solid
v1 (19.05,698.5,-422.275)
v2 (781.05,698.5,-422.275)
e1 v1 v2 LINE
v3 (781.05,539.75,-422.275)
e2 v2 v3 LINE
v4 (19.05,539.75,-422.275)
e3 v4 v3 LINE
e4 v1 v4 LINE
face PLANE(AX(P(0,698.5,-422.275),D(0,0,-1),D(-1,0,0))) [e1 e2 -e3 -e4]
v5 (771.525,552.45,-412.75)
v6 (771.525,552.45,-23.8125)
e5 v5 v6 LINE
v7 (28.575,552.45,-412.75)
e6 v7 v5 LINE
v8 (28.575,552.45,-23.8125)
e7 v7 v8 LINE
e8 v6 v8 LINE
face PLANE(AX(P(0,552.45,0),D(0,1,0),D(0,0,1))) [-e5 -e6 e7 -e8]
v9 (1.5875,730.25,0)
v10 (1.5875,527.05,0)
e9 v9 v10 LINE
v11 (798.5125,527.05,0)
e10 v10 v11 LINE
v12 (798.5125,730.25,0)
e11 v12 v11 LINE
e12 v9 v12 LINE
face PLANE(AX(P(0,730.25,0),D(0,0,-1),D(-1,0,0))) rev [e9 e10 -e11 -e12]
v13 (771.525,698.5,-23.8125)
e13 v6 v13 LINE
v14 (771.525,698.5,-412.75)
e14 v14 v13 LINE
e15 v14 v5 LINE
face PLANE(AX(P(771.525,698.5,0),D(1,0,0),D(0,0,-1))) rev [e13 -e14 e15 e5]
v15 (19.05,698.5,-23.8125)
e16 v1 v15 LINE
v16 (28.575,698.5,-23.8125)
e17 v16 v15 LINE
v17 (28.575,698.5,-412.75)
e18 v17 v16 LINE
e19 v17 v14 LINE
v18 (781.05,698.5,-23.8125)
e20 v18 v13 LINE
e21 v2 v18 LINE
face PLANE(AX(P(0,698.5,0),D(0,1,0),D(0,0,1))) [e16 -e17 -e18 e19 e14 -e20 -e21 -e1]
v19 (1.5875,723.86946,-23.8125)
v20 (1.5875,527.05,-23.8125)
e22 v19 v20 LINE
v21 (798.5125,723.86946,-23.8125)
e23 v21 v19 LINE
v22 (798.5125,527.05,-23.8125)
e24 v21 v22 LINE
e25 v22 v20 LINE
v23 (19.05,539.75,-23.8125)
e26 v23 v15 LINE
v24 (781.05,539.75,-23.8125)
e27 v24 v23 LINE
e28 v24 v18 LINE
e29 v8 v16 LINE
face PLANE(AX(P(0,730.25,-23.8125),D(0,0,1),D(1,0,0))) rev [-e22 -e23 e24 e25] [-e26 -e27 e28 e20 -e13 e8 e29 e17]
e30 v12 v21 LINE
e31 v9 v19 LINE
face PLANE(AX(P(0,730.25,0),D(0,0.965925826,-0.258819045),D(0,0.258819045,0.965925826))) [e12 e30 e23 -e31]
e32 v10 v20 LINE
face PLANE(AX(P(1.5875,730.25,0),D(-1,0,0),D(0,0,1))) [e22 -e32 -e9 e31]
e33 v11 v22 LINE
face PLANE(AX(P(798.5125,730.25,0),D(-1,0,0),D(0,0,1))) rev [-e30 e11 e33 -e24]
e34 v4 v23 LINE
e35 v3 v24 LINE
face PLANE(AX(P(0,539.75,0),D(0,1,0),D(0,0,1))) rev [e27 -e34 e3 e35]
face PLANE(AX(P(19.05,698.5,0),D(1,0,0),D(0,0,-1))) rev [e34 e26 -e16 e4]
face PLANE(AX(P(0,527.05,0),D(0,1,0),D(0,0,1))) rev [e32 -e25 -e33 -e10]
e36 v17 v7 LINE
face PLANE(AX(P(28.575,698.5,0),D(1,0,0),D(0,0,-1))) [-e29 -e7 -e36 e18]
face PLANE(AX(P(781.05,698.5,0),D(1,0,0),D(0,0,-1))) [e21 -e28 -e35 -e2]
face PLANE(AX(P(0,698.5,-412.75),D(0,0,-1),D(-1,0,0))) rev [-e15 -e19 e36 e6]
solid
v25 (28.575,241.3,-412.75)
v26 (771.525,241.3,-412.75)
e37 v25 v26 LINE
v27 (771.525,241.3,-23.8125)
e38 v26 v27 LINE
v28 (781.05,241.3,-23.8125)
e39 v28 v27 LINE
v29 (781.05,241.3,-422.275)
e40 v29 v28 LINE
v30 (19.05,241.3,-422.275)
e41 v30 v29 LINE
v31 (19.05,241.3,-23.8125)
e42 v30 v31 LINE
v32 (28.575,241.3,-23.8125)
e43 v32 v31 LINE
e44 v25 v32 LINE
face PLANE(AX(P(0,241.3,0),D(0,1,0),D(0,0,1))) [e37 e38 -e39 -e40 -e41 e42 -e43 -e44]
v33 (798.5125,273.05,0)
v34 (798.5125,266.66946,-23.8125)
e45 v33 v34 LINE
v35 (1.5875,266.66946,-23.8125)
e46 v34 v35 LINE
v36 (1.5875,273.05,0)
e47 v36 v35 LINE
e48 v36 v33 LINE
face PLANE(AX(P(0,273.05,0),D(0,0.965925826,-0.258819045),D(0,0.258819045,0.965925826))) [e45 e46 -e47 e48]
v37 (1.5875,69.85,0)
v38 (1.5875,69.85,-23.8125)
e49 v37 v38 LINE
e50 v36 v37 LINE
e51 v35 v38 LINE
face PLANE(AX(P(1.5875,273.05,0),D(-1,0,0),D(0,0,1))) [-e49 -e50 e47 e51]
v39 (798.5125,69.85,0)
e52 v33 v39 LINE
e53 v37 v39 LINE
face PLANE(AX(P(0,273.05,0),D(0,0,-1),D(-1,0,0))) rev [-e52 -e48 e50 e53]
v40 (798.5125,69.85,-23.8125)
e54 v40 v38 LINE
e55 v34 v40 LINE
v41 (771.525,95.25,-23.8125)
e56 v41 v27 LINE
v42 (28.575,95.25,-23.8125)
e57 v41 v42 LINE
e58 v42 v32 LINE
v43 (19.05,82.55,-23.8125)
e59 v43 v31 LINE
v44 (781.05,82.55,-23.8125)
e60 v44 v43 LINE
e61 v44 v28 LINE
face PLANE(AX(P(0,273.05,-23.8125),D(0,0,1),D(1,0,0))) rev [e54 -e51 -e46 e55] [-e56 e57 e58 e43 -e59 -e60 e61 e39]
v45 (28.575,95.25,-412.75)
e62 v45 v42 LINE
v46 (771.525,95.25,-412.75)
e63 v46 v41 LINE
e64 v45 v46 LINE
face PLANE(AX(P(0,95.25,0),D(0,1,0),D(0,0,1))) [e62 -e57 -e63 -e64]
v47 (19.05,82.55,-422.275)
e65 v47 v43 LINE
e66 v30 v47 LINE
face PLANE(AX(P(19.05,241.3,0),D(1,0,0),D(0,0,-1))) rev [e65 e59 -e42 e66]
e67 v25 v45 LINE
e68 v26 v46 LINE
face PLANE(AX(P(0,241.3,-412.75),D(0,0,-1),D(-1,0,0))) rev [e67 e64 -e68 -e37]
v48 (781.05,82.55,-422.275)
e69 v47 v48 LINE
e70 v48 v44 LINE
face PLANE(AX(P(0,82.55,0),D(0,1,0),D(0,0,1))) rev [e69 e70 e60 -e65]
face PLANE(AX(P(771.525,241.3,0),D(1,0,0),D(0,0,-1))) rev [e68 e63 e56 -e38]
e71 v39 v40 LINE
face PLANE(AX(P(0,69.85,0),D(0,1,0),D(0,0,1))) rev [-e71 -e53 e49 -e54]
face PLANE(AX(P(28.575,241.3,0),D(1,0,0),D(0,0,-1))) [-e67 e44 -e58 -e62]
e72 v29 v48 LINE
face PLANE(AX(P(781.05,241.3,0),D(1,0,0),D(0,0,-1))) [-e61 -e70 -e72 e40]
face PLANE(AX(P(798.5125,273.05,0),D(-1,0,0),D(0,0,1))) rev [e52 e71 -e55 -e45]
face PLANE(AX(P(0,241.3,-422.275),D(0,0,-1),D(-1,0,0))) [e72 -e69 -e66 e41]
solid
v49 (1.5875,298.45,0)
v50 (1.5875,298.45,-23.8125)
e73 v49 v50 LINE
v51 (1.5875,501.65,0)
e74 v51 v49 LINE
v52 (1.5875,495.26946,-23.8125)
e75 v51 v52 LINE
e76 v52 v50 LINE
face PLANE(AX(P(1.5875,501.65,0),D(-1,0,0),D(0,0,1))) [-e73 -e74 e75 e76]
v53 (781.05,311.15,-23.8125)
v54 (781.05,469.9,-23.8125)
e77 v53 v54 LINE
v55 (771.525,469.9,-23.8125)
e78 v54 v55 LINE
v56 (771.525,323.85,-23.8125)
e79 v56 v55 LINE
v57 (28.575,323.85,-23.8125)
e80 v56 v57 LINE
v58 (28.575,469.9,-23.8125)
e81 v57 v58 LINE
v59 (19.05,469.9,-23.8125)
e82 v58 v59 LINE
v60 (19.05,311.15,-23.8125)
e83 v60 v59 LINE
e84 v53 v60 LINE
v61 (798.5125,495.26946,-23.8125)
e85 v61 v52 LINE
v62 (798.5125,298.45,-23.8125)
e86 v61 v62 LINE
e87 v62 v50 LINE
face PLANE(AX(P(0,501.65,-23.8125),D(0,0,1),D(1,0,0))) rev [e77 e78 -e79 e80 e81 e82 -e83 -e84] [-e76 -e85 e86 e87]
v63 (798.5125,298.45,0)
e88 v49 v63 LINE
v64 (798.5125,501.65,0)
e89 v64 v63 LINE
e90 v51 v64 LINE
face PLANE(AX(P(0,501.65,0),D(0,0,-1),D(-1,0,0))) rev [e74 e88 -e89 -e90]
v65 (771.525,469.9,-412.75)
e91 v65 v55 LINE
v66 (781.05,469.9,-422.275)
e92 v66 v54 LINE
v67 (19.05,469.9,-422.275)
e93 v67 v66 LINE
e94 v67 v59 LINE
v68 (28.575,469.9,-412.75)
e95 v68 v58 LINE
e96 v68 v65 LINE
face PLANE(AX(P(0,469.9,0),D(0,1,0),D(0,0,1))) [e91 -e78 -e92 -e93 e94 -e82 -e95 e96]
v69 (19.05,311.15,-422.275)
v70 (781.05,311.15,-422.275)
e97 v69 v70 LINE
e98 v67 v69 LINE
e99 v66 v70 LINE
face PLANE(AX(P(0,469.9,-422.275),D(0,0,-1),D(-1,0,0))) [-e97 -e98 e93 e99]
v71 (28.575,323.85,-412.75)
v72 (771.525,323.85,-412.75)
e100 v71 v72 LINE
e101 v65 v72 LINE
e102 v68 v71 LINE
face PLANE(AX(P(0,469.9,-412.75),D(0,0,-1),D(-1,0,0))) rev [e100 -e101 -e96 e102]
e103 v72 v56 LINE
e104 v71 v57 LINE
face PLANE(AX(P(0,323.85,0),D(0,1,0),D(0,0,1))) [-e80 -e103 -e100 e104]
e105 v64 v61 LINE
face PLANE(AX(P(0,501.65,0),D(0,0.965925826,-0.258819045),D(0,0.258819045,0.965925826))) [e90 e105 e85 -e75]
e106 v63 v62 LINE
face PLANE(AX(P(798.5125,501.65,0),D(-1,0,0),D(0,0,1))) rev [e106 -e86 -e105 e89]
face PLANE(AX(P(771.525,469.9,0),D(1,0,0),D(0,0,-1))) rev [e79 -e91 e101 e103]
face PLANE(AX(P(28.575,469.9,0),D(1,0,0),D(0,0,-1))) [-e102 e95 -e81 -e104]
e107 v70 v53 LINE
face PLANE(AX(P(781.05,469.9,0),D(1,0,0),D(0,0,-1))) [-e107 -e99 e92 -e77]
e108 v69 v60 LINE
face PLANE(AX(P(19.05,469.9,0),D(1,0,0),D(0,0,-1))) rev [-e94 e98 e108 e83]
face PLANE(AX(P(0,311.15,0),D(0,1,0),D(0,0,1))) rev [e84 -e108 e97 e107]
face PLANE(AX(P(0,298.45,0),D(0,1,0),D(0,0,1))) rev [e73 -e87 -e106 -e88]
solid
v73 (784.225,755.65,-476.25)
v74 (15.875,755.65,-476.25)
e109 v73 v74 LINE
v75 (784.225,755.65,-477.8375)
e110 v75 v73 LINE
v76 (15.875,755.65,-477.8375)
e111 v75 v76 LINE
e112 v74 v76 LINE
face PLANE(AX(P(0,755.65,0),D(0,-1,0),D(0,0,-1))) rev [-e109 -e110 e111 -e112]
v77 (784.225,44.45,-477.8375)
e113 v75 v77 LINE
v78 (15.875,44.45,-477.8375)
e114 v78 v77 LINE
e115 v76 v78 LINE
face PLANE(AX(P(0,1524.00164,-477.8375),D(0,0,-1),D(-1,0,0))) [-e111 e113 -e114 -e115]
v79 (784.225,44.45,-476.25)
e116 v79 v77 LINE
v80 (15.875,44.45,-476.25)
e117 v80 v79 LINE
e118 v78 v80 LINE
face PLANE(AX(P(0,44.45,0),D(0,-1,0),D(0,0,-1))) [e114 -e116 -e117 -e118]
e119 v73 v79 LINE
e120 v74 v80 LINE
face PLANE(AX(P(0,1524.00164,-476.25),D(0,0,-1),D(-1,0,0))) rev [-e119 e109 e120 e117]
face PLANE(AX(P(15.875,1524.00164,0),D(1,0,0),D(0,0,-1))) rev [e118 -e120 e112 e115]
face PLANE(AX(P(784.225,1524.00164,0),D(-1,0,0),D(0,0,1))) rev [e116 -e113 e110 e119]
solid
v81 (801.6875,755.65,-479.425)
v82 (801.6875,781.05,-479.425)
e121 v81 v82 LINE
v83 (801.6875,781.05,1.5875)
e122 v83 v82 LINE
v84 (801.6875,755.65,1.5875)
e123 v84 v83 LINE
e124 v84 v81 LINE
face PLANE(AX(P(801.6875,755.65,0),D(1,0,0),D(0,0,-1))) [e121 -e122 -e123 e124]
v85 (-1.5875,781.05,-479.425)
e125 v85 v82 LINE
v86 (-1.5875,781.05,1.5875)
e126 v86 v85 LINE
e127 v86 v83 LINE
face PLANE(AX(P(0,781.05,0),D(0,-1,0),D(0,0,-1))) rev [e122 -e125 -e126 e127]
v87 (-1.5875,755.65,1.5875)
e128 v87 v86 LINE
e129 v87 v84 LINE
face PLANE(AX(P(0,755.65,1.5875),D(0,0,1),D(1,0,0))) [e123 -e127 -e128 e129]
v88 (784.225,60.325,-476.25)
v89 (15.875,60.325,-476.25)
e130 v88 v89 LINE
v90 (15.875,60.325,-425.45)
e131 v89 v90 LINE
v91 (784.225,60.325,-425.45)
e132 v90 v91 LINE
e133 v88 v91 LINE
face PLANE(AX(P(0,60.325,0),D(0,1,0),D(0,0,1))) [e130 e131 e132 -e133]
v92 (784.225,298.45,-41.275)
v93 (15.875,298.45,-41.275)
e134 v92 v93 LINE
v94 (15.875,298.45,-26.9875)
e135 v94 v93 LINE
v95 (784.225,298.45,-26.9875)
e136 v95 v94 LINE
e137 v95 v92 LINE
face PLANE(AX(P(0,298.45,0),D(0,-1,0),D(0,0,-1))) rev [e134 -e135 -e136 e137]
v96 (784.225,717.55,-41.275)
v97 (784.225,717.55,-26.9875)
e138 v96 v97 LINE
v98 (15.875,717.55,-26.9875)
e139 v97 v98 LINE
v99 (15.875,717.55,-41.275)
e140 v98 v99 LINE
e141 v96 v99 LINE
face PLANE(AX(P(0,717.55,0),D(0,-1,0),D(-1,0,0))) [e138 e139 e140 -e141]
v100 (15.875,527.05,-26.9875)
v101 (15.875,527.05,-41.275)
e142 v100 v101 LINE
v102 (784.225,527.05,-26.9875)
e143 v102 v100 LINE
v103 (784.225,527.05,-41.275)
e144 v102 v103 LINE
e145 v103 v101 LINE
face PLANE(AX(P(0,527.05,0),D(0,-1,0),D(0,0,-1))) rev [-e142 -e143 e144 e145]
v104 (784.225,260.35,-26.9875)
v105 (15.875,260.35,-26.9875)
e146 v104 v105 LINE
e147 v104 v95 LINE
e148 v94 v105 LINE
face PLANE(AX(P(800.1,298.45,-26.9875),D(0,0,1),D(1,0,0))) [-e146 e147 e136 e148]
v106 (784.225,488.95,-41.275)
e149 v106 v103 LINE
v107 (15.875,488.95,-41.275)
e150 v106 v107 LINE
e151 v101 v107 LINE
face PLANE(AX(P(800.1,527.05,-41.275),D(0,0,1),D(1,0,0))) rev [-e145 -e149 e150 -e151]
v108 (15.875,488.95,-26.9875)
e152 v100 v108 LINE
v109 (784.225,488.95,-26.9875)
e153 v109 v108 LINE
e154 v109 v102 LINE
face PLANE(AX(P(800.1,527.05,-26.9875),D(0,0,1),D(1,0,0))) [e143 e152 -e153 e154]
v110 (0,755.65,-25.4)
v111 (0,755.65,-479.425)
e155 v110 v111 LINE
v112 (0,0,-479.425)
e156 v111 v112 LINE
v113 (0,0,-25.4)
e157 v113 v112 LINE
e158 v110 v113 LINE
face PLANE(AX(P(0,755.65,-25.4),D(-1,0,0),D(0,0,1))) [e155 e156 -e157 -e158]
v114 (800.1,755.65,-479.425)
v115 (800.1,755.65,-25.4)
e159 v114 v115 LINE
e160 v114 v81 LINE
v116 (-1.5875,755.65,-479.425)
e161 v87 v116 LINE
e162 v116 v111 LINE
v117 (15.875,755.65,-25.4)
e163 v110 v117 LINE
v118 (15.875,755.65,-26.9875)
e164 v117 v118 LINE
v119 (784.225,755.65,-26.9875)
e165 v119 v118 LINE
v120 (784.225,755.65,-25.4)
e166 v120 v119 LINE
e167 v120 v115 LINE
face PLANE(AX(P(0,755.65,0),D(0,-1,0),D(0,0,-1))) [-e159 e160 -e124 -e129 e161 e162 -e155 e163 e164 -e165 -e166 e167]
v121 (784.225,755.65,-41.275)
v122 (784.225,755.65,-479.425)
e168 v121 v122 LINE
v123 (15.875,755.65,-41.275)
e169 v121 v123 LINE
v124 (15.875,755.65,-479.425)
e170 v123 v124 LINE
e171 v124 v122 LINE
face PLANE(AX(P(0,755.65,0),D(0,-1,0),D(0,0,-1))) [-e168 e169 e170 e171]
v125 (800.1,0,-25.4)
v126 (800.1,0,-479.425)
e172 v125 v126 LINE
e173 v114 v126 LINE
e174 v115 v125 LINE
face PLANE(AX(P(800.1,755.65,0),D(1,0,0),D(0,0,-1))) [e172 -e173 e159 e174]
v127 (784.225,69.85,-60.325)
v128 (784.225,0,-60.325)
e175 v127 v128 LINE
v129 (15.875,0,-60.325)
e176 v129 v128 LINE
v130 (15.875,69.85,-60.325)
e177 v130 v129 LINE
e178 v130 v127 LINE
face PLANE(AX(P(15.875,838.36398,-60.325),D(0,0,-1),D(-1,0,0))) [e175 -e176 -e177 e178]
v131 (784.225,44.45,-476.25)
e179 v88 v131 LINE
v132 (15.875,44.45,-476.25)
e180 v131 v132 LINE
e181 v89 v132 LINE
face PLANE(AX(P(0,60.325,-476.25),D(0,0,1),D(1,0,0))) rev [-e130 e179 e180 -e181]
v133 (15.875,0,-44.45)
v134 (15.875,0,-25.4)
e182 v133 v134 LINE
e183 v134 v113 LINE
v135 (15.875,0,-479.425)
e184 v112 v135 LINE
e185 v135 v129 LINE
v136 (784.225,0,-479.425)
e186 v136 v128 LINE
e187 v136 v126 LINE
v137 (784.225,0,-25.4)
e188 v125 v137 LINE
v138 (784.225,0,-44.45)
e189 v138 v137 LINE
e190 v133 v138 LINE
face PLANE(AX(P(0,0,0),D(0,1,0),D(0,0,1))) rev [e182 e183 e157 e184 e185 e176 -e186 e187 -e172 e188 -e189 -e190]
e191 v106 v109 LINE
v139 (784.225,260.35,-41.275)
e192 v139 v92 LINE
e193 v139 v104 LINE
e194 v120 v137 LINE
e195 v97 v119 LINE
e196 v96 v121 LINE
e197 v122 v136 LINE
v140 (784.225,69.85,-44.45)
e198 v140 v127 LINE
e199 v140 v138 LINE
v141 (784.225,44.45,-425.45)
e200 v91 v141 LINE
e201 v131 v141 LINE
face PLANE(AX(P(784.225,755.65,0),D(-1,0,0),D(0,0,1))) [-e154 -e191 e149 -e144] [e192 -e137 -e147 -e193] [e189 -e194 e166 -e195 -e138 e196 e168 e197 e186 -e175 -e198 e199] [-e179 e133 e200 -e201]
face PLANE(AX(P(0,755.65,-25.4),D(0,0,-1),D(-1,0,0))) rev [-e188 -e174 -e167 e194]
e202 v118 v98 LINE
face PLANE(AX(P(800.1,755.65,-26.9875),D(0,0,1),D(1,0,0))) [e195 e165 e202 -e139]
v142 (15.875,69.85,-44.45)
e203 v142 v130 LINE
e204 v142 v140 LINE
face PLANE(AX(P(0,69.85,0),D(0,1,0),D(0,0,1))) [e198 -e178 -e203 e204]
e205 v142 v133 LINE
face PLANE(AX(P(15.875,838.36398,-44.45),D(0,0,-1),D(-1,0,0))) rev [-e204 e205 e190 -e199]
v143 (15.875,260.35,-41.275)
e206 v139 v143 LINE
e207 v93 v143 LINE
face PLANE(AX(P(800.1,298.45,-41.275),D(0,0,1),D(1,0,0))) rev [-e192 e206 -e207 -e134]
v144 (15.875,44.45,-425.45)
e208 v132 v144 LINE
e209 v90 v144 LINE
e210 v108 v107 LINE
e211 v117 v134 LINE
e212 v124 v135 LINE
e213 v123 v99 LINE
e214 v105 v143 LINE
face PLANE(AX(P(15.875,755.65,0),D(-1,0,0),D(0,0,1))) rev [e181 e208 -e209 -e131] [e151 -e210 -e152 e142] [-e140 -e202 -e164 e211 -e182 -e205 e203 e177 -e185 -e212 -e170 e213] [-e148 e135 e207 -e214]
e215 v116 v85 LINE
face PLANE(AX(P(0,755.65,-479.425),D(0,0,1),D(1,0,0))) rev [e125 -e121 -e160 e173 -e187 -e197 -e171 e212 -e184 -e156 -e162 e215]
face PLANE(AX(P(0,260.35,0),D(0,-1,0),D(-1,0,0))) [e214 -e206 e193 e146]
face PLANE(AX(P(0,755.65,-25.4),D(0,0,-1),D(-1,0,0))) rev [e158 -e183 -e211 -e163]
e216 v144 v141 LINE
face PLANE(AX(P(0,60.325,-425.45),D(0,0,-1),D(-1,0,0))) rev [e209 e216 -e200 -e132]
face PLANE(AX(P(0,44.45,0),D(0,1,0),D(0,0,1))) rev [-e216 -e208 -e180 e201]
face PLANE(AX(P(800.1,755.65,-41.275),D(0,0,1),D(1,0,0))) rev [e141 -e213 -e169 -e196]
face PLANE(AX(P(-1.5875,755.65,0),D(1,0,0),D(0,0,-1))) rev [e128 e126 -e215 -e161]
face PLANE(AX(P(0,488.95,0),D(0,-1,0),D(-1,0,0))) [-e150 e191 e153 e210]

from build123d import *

# Parameters (mm, degrees)
BASESECTIONSIDESBOSS_EXTRUDE_DEPTH       = 69.85
BASESECTIONSIDESBOSS_EXTRUDE_2_DEPTH     = 69.85
PLANSKETCH_3_W                           = 768.35
PLANSKETCH_3_H                           = 15.875
BASEFACEEXTRUDE_THIN_DEPTH               = 69.85
F_1STLEVSIDESSECTIONBOSS_EXTRUDE_START   = 69.85
F_1STLEVSIDESSECTIONBOSS_EXTRUDE_DEPTH   = 228.6
F_1STLEVSIDESSECTIONBOSS_EXTRUDE_2_DEPTH = 228.6
F_1STLEVFRONTBAREXTRUDE_THIN_START       = 260.35
PLANSKETCH_5_W                           = 800.1
PLANSKETCH_5_H                           = 15.875
F_1STLEVFRONTBAREXTRUDE_THIN_DEPTH       = 38.1
DRAWERFACEBOSS_EXTRUDE_START             = 69.85
PLANSKETCH_6_W                           = 768.35
PLANSKETCH_6_H                           = 25.4
PLANSKETCH_6_W_2                         = 15.875
DRAWERFACEBOSS_EXTRUDE_DEPTH             = 203.2
POSITIONINGMOVE_FACE_BY                  = 1.5875
POSITIONINGMOVE_FACE_2_BY                = 1.5875
POSITIONINGMOVE_FACE_3_BY                = 1.5875
POSITIONINGMOVE_FACE_4_BY                = 1.5875
DRAWERPULLTOPMOVE_START                  = 263.746046868
DRAWERPULLTOPMOVE_FACE_OUTLINE_W         = 800
DRAWERPULLTOPMOVE_FACE_OUTLINE_H         = 27
DRAWERPULLTOPMOVE_FACE_DEPTH             = 6.163128512
BASEBACKBEAMBOSS_EXTRUDE_START           = 44.45
PLANSKETCH_8_W                           = 768.35
PLANSKETCH_8_H                           = 50.8
BASEBACKBEAMBOSS_EXTRUDE_DEPTH           = 15.875
DRAWERBODYBOSS_EXTRUDE_START             = 82.55
PLANSKETCH_9_W                           = 768.35
PLANSKETCH_9_H                           = 381
PLANSKETCH_9_H_2                         = 19.05
DRAWERBODYBOSS_EXTRUDE_DEPTH             = 158.75
DRAWERBODYSHELL_T                        = -12.7
DRAWERSIDESMOVE_FACE_BY                  = 3.175
DRAWERSIDESMOVE_FACE_2_BY                = 3.175
DRAWERSIDESMOVE_FACE_3_BY                = 3.175
DRAWERMERGEMOVE_START                    = -25.4
DRAWERMERGEMOVE_FACE_DEPTH               = 12.7
HEIGHTLPATTERN_COUNT                     = 3
HEIGHTLPATTERN_PITCH                     = 228.6
TOPBOARDBOSS_EXTRUDE_START               = 781.05
PLANSKETCH_10_W                          = 800.1
PLANSKETCH_10_H                          = 479.425
TOPBOARDBOSS_EXTRUDE_DEPTH               = 25.4
BACKBOARDEXTRUDE_THIN_START              = 44.45
PLANSKETCH_11_W                          = 768.35
PLANSKETCH_11_H                          = 1.5875
BACKBOARDEXTRUDE_THIN_DEPTH              = 711.2
TOPBOARDEXPANDMOVE_FACE_BY               = 1.5875
TOPBOARDEXPANDMOVE_FACE_2_BY             = 1.5875
TOPBOARDEXPANDMOVE_FACE_3_BY             = 1.5875


# Read off the part's stored shape, not the designer's step: DrawerPullTopMove Face, DrawerMergeMove Face
with BuildPart() as part:
    # PlanSketch → BaseSectionSidesBoss-Extrude (new body)
    with BuildSketch(Plane(origin=(0, 0, 0), x_dir=(1, 0, 0), z_dir=(0, 1, 0))):
        Polygon((800.1, 479.425), (784.225, 479.425), (784.225, 476.25), (784.225, 425.45), (784.225, 44.45), (784.225, 25.4), (800.1, 25.4), align=None)
    extrude(amount=BASESECTIONSIDESBOSS_EXTRUDE_DEPTH)



with BuildPart() as body_2:
    # PlanSketch → BaseSectionSidesBoss-Extrude 2 (new body)
    with BuildSketch(Plane(origin=(0, 0, 0), x_dir=(1, 0, 0), z_dir=(0, 1, 0))):
        Polygon((15.875, 476.25), (15.875, 479.425), (0, 479.425), (0, 25.4), (15.875, 25.4), (15.875, 44.45), (15.875, 425.45), align=None)
    extrude(amount=BASESECTIONSIDESBOSS_EXTRUDE_2_DEPTH)


with BuildPart() as part_1:
    add(part.part)

    add(body_2.part)  # BaseFaceExtrude-Thin merges body 2
    # PlanSketch<3> → BaseFaceExtrude-Thin (add)
    with BuildSketch(Plane(origin=(0, 0, 0), x_dir=(1, 0, 0), z_dir=(0, 1, 0))):
        with Locations((400.05, 52.3875)):
            Rectangle(PLANSKETCH_3_W, PLANSKETCH_3_H)
    extrude(amount=BASEFACEEXTRUDE_THIN_DEPTH)

    # PlanSketch<8> → BaseBackBeamBoss-Extrude (add)
    with BuildSketch(Plane(origin=(0, 0, 0), x_dir=(1, 0, 0), z_dir=(0, 1, 0)).offset(BASEBACKBEAMBOSS_EXTRUDE_START)):
        with Locations((400.05, 450.85)):
            Rectangle(PLANSKETCH_8_W, PLANSKETCH_8_H)
    extrude(amount=BASEBACKBEAMBOSS_EXTRUDE_DEPTH)


with BuildPart() as body_2_2:
    # PlanSketch<4> → 1stLevSidesSectionBoss-Extrude (new body)
    with BuildSketch(Plane(origin=(0, 0, 0), x_dir=(1, 0, 0), z_dir=(0, 1, 0)).offset(F_1STLEVSIDESSECTIONBOSS_EXTRUDE_START)):
        Polygon((15.875, 476.25), (15.875, 479.425), (0, 479.425), (0, 25.4), (15.875, 25.4), (15.875, 44.45), (15.875, 425.45), align=None)
    extrude(amount=F_1STLEVSIDESSECTIONBOSS_EXTRUDE_DEPTH)


with BuildPart() as body_3:
    # PlanSketch<4> → 1stLevSidesSectionBoss-Extrude 2 (new body)
    with BuildSketch(Plane(origin=(0, 0, 0), x_dir=(1, 0, 0), z_dir=(0, 1, 0)).offset(F_1STLEVSIDESSECTIONBOSS_EXTRUDE_START)):
        Polygon((800.1, 479.425), (784.225, 479.425), (784.225, 476.25), (784.225, 425.45), (784.225, 44.45), (784.225, 25.4), (800.1, 25.4), align=None)
    extrude(amount=F_1STLEVSIDESSECTIONBOSS_EXTRUDE_2_DEPTH)


with BuildPart() as body_4:
    # PlanSketch<5> → 1stLevFrontBarExtrude-Thin (new body)
    with BuildSketch(Plane(origin=(0, 0, 0), x_dir=(1, 0, 0), z_dir=(0, 1, 0)).offset(F_1STLEVFRONTBAREXTRUDE_THIN_START)):
        with Locations((400.05, 33.3375)):
            Rectangle(PLANSKETCH_5_W, PLANSKETCH_5_H)
    extrude(amount=F_1STLEVFRONTBAREXTRUDE_THIN_DEPTH)

    # PositioningMove Face 4: a face moved inward by 1.5875
    extrude(body_4.faces().sort_by_distance((400.05, 279.4, -25.4))[0], amount=POSITIONINGMOVE_FACE_4_BY, dir=(0, 0, -1), mode=Mode.SUBTRACT)


with BuildPart() as body_5:
    # PlanSketch<6> → DrawerFaceBoss-Extrude (new body)
    with BuildSketch(Plane(origin=(0, 0, 0), x_dir=(1, 0, 0), z_dir=(0, 1, 0)).offset(DRAWERFACEBOSS_EXTRUDE_START)):
        with Locations((400.05, 12.7)):
            Rectangle(PLANSKETCH_6_W, PLANSKETCH_6_H)
        with Locations((792.1625, 12.7)):
            Rectangle(PLANSKETCH_6_W_2, PLANSKETCH_6_H)
        with Locations((7.9375, 12.7)):
            Rectangle(PLANSKETCH_6_W_2, PLANSKETCH_6_H)
    extrude(amount=DRAWERFACEBOSS_EXTRUDE_DEPTH)

    # PositioningMove Face: a face moved inward by 1.5875
    extrude(body_5.faces().sort_by_distance((0, 171.45, -12.7))[0], amount=POSITIONINGMOVE_FACE_BY, dir=(1, 0, 0), mode=Mode.SUBTRACT)

    # PositioningMove Face 2: a face moved inward by 1.5875
    extrude(body_5.faces().sort_by_distance((800.1, 171.45, -12.7))[0], amount=POSITIONINGMOVE_FACE_2_BY, dir=(-1, 0, 0), mode=Mode.SUBTRACT)

    # PositioningMove Face 3: a face moved inward by 1.5875
    extrude(body_5.faces().sort_by_distance((400.05, 171.45, -25.4))[0], amount=POSITIONINGMOVE_FACE_3_BY, dir=(0, 0, 1), mode=Mode.SUBTRACT)

    # DrawerPullTopMove Face outline → DrawerPullTopMove Face (cut)
    with BuildSketch(Plane(origin=(0, 0, 0), x_dir=(1, 0, 0), z_dir=(0, 0.9659258262890682, -0.2588190451025211)).offset(DRAWERPULLTOPMOVE_START)):
        with Locations((400, -58.5)):
            Rectangle(DRAWERPULLTOPMOVE_FACE_OUTLINE_W, DRAWERPULLTOPMOVE_FACE_OUTLINE_H)
    extrude(amount=DRAWERPULLTOPMOVE_FACE_DEPTH, mode=Mode.SUBTRACT)


with BuildPart() as body_6:
    # PlanSketch<9> → DrawerBodyBoss-Extrude (new body)
    with BuildSketch(Plane(origin=(0, 0, 0), x_dir=(1, 0, 0), z_dir=(0, 1, 0)).offset(DRAWERBODYBOSS_EXTRUDE_START)):
        with Locations((400.05, 234.95)):
            Rectangle(PLANSKETCH_9_W, PLANSKETCH_9_H)
        with Locations((400.05, 34.925)):
            Rectangle(PLANSKETCH_9_W, PLANSKETCH_9_H_2)
    extrude(amount=DRAWERBODYBOSS_EXTRUDE_DEPTH)

    # DrawerBodyShell
    drawerbodyshell_openings = [body_6.faces().sort_by_distance(p)[0] for p in [
        (400.05, 241.3, -225.425),
        (400.05, 161.925, -25.4),
    ]]
    offset(amount=DRAWERBODYSHELL_T, openings=drawerbodyshell_openings, kind=Kind.INTERSECTION)

    # DrawerSidesMove Face: a face moved inward by 3.175
    extrude(body_6.faces().sort_by_distance((400.05, 161.925, -425.45))[0], amount=DRAWERSIDESMOVE_FACE_BY, dir=(0, 0, 1), mode=Mode.SUBTRACT)

    # DrawerSidesMove Face 2: a face moved inward by 3.175
    extrude(body_6.faces().sort_by_distance((15.875, 161.925, -225.425))[0], amount=DRAWERSIDESMOVE_FACE_2_BY, dir=(1, 0, 0), mode=Mode.SUBTRACT)

    # DrawerSidesMove Face 3: a face moved inward by 3.175
    extrude(body_6.faces().sort_by_distance((784.225, 161.925, -225.425))[0], amount=DRAWERSIDESMOVE_FACE_3_BY, dir=(-1, 0, 0), mode=Mode.SUBTRACT)

    # DrawerMergeMove Face outline → DrawerMergeMove Face (add)
    with BuildSketch(Plane.XY.offset(DRAWERMERGEMOVE_START)):
        Polygon((19.05, 241.3), (19.05, 82.55), (781.05, 82.55), (781.05, 241.3), (771.525, 241.3), (771.525, 95.25), (28.575, 95.25), (28.575, 241.3), align=None)
    extrude(amount=DRAWERMERGEMOVE_FACE_DEPTH)


with BuildPart() as body_3_1:
    add(body_3.part)

    # 1srLevelCombine: union body 4, body 2 2
    add(body_4.part)
    add(body_2_2.part)


with BuildPart() as body_5_1:
    add(body_5.part)

    # DrawerCombine: union body 6
    add(body_6.part)


with BuildPart() as heightlpattern_1:
    # HeightLPattern: pattern copy
    add(body_5_1.part.moved(Location(Vector(0, 1, 0) * (1 * HEIGHTLPATTERN_PITCH))))


with BuildPart() as heightlpattern_2:
    # HeightLPattern: pattern copy
    add(body_5_1.part.moved(Location(Vector(0, 1, 0) * (2 * HEIGHTLPATTERN_PITCH))))


with BuildPart() as heightlpattern_3:
    # HeightLPattern: pattern copy
    add(body_3_1.part.moved(Location(Vector(0, 1, 0) * (1 * HEIGHTLPATTERN_PITCH))))


with BuildPart() as heightlpattern_4:
    # HeightLPattern: pattern copy
    add(body_3_1.part.moved(Location(Vector(0, 1, 0) * (2 * HEIGHTLPATTERN_PITCH))))


with BuildPart() as body_8:
    # PlanSketch<10> → TopBoardBoss-Extrude (new body)
    with BuildSketch(Plane(origin=(0, 0, 0), x_dir=(1, 0, 0), z_dir=(0, 1, 0)).offset(TOPBOARDBOSS_EXTRUDE_START)):
        with Locations((400.05, 239.7125)):
            Rectangle(PLANSKETCH_10_W, PLANSKETCH_10_H)
    extrude(amount=-TOPBOARDBOSS_EXTRUDE_DEPTH)

    # TopBoardExpandMove Face: a face moved outward by 1.5875
    extrude(body_8.faces().sort_by_distance((400.05, 768.35, 0))[0], amount=TOPBOARDEXPANDMOVE_FACE_BY, dir=(0, 0, 1))

    # TopBoardExpandMove Face 2: a face moved outward by 1.5875
    extrude(body_8.faces().sort_by_distance((0, 768.35, -239.7125))[0], amount=TOPBOARDEXPANDMOVE_FACE_2_BY, dir=(-1, 0, 0))

    # TopBoardExpandMove Face 3: a face moved outward by 1.5875
    extrude(body_8.faces().sort_by_distance((800.1, 768.35, -239.7125))[0], amount=TOPBOARDEXPANDMOVE_FACE_3_BY, dir=(1, 0, 0))


with BuildPart() as body_9:
    # PlanSketch<11> → BackBoardExtrude-Thin (new body)
    with BuildSketch(Plane(origin=(0, 0, 0), x_dir=(1, 0, 0), z_dir=(0, 1, 0)).offset(BACKBOARDEXTRUDE_THIN_START)):
        with Locations((400.05, 477.04375)):
            Rectangle(PLANSKETCH_11_W, PLANSKETCH_11_H)
    extrude(amount=BACKBOARDEXTRUDE_THIN_DEPTH)


with BuildPart() as heightlpattern_4_1:
    add(heightlpattern_4.part)

    # 2W3HCombine: union HeightLPattern_3, body 3, part, body 8
    add(heightlpattern_3.part)
    add(body_3_1.part)
    add(part_1.part)
    add(body_8.part)


solid = Compound([body_5_1.part, heightlpattern_1.part, heightlpattern_2.part, body_9.part, heightlpattern_4_1.part])
